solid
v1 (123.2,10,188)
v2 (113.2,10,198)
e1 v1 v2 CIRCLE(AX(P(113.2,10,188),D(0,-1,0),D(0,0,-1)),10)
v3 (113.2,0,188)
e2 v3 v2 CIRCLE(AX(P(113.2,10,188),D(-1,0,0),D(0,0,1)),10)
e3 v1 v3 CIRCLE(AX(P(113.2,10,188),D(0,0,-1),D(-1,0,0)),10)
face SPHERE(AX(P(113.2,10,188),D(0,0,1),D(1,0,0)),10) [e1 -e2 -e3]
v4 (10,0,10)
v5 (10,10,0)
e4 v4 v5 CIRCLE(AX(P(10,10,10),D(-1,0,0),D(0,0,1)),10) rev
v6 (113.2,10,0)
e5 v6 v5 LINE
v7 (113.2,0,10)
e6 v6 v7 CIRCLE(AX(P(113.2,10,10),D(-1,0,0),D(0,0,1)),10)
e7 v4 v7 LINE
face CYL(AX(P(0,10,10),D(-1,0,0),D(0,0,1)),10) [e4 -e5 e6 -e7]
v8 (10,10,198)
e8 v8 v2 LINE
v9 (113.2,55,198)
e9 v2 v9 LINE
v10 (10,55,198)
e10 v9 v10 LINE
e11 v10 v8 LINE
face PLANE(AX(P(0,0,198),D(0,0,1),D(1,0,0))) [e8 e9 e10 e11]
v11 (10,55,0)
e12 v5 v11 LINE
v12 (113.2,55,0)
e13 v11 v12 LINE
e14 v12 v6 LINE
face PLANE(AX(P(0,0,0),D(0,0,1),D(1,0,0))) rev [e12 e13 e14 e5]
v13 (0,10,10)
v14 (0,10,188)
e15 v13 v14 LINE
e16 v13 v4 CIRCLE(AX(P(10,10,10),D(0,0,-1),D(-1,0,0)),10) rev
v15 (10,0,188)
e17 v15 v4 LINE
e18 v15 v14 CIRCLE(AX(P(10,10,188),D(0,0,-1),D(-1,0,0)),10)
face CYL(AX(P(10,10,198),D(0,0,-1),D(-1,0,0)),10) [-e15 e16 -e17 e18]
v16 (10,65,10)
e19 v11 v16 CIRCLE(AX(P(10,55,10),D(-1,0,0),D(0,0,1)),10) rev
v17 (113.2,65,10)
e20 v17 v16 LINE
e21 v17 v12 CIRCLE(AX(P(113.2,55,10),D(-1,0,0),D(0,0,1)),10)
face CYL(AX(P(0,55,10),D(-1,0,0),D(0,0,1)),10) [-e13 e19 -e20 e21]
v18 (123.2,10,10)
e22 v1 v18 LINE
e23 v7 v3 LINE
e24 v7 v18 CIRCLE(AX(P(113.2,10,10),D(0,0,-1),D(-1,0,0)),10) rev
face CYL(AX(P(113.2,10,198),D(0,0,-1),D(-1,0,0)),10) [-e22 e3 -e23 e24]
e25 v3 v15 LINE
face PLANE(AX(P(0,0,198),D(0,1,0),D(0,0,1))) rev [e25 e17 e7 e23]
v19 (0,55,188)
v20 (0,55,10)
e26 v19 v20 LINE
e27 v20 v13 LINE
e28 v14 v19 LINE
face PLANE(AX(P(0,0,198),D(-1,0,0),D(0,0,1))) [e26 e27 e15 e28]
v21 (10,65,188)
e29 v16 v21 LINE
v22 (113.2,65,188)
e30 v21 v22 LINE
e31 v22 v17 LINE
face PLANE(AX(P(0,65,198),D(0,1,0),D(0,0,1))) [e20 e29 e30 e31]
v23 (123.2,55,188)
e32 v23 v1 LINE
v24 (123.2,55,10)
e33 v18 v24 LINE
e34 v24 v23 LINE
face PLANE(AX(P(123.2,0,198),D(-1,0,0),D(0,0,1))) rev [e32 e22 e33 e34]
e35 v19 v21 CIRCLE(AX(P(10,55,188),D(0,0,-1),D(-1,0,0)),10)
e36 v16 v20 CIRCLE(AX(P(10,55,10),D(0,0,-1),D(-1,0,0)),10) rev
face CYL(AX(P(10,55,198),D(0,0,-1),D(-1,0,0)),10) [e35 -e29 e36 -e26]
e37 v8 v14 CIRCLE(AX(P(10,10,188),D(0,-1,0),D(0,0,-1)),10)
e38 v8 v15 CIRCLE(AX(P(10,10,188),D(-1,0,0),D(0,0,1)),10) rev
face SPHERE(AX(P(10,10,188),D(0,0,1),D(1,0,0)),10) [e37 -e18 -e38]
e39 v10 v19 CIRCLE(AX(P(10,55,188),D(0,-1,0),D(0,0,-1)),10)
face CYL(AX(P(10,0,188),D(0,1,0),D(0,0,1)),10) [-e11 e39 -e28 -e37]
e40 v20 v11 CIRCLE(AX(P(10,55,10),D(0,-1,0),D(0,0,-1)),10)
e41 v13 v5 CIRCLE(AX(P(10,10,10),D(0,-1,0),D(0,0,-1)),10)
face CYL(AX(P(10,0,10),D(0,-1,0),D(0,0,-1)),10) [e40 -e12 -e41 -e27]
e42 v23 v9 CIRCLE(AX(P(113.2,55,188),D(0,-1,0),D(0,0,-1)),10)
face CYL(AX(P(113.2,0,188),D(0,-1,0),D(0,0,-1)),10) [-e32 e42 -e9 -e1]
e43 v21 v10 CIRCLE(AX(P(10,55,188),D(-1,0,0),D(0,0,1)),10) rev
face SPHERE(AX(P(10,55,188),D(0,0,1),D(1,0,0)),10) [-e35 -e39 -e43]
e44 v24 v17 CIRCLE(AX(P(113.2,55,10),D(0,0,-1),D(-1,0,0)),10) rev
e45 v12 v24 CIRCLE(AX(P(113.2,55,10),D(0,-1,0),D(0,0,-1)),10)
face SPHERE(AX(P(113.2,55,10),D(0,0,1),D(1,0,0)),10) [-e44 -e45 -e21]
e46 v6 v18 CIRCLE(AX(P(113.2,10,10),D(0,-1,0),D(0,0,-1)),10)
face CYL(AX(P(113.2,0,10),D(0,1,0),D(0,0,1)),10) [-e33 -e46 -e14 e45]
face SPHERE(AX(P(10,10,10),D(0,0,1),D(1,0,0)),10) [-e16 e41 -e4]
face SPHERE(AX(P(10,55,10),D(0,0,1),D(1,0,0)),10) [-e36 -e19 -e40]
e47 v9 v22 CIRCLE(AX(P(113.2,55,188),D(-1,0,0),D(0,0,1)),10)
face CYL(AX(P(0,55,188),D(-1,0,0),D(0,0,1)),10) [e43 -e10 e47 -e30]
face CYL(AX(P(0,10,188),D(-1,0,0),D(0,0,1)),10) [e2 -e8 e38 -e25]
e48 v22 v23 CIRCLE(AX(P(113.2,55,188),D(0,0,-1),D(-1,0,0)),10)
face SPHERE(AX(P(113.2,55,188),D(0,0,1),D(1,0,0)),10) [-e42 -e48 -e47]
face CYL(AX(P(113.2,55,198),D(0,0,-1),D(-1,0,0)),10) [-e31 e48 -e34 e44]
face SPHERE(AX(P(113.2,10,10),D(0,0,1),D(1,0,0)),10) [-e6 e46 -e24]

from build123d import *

# Parameters (mm, degrees)
SKETCH1_W           = 123.2
SKETCH1_H           = 65
BOSS_EXTRUDE1_DEPTH = 198
FILLET1_R           = 10
FILLET2_R           = 10
FILLET3_R           = 10


with BuildPart() as part:
    # Sketch1 → Boss-Extrude1 (new body)
    with BuildSketch(Plane.XY):
        with Locations((61.6, 32.5)):
            Rectangle(SKETCH1_W, SKETCH1_H)
    extrude(amount=BOSS_EXTRUDE1_DEPTH)

    # Fillet1
    fillet1_edges = [part.edges().sort_by_distance(p)[0] for p in [
        (61.6, 65, 198),
        (61.6, 65, 0),
        (0, 65, 99),
        (123.2, 65, 99),
    ]]
    fillet(fillet1_edges, radius=FILLET1_R)

    # Fillet2
    fillet2_edges = [part.edges().sort_by_distance(p)[0] for p in [
        (61.6, 0, 198),
        (61.6, 0, 0),
        (0, 0, 99),
        (123.2, 0, 99),
    ]]
    fillet(fillet2_edges, radius=FILLET2_R)

    # Fillet3
    # the kernel refuses this fillet: 10 mm, written as the material it takes off along each edge
    with BuildSketch(Plane(origin=(113.2, 55, 10), x_dir=(0, 0, -1), z_dir=(1, 0, 0))) as fillet3_piece_1_section:
        Polygon((0, 0), (FILLET3_R * 1.02, 0), (FILLET3_R * 1.02, FILLET3_R * 1.02), (0, FILLET3_R * 1.02), align=None)
    fillet3_piece_1 = extrude(amount=FILLET3_R * 1.02, mode=Mode.PRIVATE)
    fillet3_piece_1 = fillet3_piece_1 - Plane(origin=(113.2, 55, 10), x_dir=(0, -0.7071067811865475, 0.7071067811865475), z_dir=(1, 0, 0)) * Sphere(FILLET3_R, mode=Mode.PRIVATE)
    add(fillet3_piece_1, mode=Mode.SUBTRACT)
    with BuildSketch(Plane(origin=(113.2, 55, 188), x_dir=(0, 0, 1), z_dir=(1, 0, 0))) as fillet3_piece_2_section:
        Polygon((0, 0), (FILLET3_R * 1.02, 0), (FILLET3_R * 1.02, -FILLET3_R * 1.02), (0, -FILLET3_R * 1.02), align=None)
    fillet3_piece_2 = extrude(amount=FILLET3_R * 1.02, mode=Mode.PRIVATE)
    fillet3_piece_2 = fillet3_piece_2 - Plane(origin=(113.2, 55, 188), x_dir=(0, -0.7071067811865475, -0.7071067811865475), z_dir=(1, 0, 0)) * Sphere(FILLET3_R, mode=Mode.PRIVATE)
    add(fillet3_piece_2, mode=Mode.SUBTRACT)
    with BuildSketch(Plane(origin=(10, 55, 188), x_dir=(-1, 0, 0), z_dir=(0, 0, 1))) as fillet3_piece_3_section:
        Polygon((0, 0), (FILLET3_R * 1.02, 0), (FILLET3_R * 1.02, -FILLET3_R * 1.02), (0, -FILLET3_R * 1.02), align=None)
    fillet3_piece_3 = extrude(amount=FILLET3_R * 1.02, mode=Mode.PRIVATE)
    fillet3_piece_3 = fillet3_piece_3 - Plane(origin=(10, 55, 188), x_dir=(0.7071067811865475, -0.7071067811865475, 0), z_dir=(0, 0, 1)) * Sphere(FILLET3_R, mode=Mode.PRIVATE)
    add(fillet3_piece_3, mode=Mode.SUBTRACT)
    with BuildSketch(Plane(origin=(10, 55, 10), x_dir=(-1, 0, 0), z_dir=(0, 0, -1))) as fillet3_piece_4_section:
        Polygon((0, 0), (FILLET3_R * 1.02, 0), (FILLET3_R * 1.02, FILLET3_R * 1.02), (0, FILLET3_R * 1.02), align=None)
    fillet3_piece_4 = extrude(amount=FILLET3_R * 1.02, mode=Mode.PRIVATE)
    fillet3_piece_4 = fillet3_piece_4 - Plane(origin=(10, 55, 10), x_dir=(0.7071067811865475, -0.7071067811865475, 0), z_dir=(0, 0, -1)) * Sphere(FILLET3_R, mode=Mode.PRIVATE)
    add(fillet3_piece_4, mode=Mode.SUBTRACT)
    with BuildSketch(Plane(origin=(10, 10, 10), x_dir=(-1, 0, 0), z_dir=(0, 0, -1))) as fillet3_piece_5_section:
        Polygon((0, 0), (FILLET3_R * 1.02, 0), (FILLET3_R * 1.02, -FILLET3_R * 1.02), (0, -FILLET3_R * 1.02), align=None)
    fillet3_piece_5 = extrude(amount=FILLET3_R * 1.02, mode=Mode.PRIVATE)
    fillet3_piece_5 = fillet3_piece_5 - Plane(origin=(10, 10, 10), x_dir=(0.7071067811865475, 0.7071067811865475, 0), z_dir=(0, 0, -1)) * Sphere(FILLET3_R, mode=Mode.PRIVATE)
    add(fillet3_piece_5, mode=Mode.SUBTRACT)
    with BuildSketch(Plane(origin=(10, 10, 188), x_dir=(-1, 0, 0), z_dir=(0, 0, 1))) as fillet3_piece_6_section:
        Polygon((0, 0), (FILLET3_R * 1.02, 0), (FILLET3_R * 1.02, FILLET3_R * 1.02), (0, FILLET3_R * 1.02), align=None)
    fillet3_piece_6 = extrude(amount=FILLET3_R * 1.02, mode=Mode.PRIVATE)
    fillet3_piece_6 = fillet3_piece_6 - Plane(origin=(10, 10, 188), x_dir=(0.7071067811865475, 0.7071067811865475, 0), z_dir=(0, 0, 1)) * Sphere(FILLET3_R, mode=Mode.PRIVATE)
    add(fillet3_piece_6, mode=Mode.SUBTRACT)
    with BuildSketch(Plane(origin=(113.2, 10, 188), x_dir=(0, 0, 1), z_dir=(1, 0, 0))) as fillet3_piece_7_section:
        Polygon((0, 0), (FILLET3_R * 1.02, 0), (FILLET3_R * 1.02, FILLET3_R * 1.02), (0, FILLET3_R * 1.02), align=None)
    fillet3_piece_7 = extrude(amount=FILLET3_R * 1.02, mode=Mode.PRIVATE)
    fillet3_piece_7 = fillet3_piece_7 - Plane(origin=(113.2, 10, 188), x_dir=(0, 0.7071067811865475, -0.7071067811865475), z_dir=(1, 0, 0)) * Sphere(FILLET3_R, mode=Mode.PRIVATE)
    add(fillet3_piece_7, mode=Mode.SUBTRACT)
    with BuildSketch(Plane(origin=(113.2, 10, 10), x_dir=(0, 0, -1), z_dir=(1, 0, 0))) as fillet3_piece_8_section:
        Polygon((0, 0), (FILLET3_R * 1.02, 0), (FILLET3_R * 1.02, -FILLET3_R * 1.02), (0, -FILLET3_R * 1.02), align=None)
    fillet3_piece_8 = extrude(amount=FILLET3_R * 1.02, mode=Mode.PRIVATE)
    fillet3_piece_8 = fillet3_piece_8 - Plane(origin=(113.2, 10, 10), x_dir=(0, 0.7071067811865475, 0.7071067811865475), z_dir=(1, 0, 0)) * Sphere(FILLET3_R, mode=Mode.PRIVATE)
    add(fillet3_piece_8, mode=Mode.SUBTRACT)
    with BuildSketch(Plane(origin=(0, 55, 0), x_dir=(1, 0, 0), z_dir=(0, -1, 0)), Plane(origin=(123.2, 10, 198), x_dir=(0, 0, -1), z_dir=(0, 1, 0))) as fillet3_piece_9:
        with BuildLine():
            CenterArc((FILLET3_R, FILLET3_R), FILLET3_R, 180, 90)
            Line((0, FILLET3_R), (0, 0))
            Line((0, 0), (FILLET3_R, 0))
        make_face()
    extrude(amount=45, mode=Mode.SUBTRACT)
    with BuildSketch(Plane(origin=(123.2, 10, 0), x_dir=(0, 0, 1), z_dir=(0, 1, 0)), Plane(origin=(0, 55, 198), x_dir=(1, 0, 0), z_dir=(0, -1, 0))) as fillet3_piece_10:
        with BuildLine():
            CenterArc((FILLET3_R, -FILLET3_R), FILLET3_R, 90, 90)
            Line((0, -FILLET3_R), (0, 0))
            Line((0, 0), (FILLET3_R, 0))
        make_face()
    extrude(amount=45, mode=Mode.SUBTRACT)


solid = part.part
